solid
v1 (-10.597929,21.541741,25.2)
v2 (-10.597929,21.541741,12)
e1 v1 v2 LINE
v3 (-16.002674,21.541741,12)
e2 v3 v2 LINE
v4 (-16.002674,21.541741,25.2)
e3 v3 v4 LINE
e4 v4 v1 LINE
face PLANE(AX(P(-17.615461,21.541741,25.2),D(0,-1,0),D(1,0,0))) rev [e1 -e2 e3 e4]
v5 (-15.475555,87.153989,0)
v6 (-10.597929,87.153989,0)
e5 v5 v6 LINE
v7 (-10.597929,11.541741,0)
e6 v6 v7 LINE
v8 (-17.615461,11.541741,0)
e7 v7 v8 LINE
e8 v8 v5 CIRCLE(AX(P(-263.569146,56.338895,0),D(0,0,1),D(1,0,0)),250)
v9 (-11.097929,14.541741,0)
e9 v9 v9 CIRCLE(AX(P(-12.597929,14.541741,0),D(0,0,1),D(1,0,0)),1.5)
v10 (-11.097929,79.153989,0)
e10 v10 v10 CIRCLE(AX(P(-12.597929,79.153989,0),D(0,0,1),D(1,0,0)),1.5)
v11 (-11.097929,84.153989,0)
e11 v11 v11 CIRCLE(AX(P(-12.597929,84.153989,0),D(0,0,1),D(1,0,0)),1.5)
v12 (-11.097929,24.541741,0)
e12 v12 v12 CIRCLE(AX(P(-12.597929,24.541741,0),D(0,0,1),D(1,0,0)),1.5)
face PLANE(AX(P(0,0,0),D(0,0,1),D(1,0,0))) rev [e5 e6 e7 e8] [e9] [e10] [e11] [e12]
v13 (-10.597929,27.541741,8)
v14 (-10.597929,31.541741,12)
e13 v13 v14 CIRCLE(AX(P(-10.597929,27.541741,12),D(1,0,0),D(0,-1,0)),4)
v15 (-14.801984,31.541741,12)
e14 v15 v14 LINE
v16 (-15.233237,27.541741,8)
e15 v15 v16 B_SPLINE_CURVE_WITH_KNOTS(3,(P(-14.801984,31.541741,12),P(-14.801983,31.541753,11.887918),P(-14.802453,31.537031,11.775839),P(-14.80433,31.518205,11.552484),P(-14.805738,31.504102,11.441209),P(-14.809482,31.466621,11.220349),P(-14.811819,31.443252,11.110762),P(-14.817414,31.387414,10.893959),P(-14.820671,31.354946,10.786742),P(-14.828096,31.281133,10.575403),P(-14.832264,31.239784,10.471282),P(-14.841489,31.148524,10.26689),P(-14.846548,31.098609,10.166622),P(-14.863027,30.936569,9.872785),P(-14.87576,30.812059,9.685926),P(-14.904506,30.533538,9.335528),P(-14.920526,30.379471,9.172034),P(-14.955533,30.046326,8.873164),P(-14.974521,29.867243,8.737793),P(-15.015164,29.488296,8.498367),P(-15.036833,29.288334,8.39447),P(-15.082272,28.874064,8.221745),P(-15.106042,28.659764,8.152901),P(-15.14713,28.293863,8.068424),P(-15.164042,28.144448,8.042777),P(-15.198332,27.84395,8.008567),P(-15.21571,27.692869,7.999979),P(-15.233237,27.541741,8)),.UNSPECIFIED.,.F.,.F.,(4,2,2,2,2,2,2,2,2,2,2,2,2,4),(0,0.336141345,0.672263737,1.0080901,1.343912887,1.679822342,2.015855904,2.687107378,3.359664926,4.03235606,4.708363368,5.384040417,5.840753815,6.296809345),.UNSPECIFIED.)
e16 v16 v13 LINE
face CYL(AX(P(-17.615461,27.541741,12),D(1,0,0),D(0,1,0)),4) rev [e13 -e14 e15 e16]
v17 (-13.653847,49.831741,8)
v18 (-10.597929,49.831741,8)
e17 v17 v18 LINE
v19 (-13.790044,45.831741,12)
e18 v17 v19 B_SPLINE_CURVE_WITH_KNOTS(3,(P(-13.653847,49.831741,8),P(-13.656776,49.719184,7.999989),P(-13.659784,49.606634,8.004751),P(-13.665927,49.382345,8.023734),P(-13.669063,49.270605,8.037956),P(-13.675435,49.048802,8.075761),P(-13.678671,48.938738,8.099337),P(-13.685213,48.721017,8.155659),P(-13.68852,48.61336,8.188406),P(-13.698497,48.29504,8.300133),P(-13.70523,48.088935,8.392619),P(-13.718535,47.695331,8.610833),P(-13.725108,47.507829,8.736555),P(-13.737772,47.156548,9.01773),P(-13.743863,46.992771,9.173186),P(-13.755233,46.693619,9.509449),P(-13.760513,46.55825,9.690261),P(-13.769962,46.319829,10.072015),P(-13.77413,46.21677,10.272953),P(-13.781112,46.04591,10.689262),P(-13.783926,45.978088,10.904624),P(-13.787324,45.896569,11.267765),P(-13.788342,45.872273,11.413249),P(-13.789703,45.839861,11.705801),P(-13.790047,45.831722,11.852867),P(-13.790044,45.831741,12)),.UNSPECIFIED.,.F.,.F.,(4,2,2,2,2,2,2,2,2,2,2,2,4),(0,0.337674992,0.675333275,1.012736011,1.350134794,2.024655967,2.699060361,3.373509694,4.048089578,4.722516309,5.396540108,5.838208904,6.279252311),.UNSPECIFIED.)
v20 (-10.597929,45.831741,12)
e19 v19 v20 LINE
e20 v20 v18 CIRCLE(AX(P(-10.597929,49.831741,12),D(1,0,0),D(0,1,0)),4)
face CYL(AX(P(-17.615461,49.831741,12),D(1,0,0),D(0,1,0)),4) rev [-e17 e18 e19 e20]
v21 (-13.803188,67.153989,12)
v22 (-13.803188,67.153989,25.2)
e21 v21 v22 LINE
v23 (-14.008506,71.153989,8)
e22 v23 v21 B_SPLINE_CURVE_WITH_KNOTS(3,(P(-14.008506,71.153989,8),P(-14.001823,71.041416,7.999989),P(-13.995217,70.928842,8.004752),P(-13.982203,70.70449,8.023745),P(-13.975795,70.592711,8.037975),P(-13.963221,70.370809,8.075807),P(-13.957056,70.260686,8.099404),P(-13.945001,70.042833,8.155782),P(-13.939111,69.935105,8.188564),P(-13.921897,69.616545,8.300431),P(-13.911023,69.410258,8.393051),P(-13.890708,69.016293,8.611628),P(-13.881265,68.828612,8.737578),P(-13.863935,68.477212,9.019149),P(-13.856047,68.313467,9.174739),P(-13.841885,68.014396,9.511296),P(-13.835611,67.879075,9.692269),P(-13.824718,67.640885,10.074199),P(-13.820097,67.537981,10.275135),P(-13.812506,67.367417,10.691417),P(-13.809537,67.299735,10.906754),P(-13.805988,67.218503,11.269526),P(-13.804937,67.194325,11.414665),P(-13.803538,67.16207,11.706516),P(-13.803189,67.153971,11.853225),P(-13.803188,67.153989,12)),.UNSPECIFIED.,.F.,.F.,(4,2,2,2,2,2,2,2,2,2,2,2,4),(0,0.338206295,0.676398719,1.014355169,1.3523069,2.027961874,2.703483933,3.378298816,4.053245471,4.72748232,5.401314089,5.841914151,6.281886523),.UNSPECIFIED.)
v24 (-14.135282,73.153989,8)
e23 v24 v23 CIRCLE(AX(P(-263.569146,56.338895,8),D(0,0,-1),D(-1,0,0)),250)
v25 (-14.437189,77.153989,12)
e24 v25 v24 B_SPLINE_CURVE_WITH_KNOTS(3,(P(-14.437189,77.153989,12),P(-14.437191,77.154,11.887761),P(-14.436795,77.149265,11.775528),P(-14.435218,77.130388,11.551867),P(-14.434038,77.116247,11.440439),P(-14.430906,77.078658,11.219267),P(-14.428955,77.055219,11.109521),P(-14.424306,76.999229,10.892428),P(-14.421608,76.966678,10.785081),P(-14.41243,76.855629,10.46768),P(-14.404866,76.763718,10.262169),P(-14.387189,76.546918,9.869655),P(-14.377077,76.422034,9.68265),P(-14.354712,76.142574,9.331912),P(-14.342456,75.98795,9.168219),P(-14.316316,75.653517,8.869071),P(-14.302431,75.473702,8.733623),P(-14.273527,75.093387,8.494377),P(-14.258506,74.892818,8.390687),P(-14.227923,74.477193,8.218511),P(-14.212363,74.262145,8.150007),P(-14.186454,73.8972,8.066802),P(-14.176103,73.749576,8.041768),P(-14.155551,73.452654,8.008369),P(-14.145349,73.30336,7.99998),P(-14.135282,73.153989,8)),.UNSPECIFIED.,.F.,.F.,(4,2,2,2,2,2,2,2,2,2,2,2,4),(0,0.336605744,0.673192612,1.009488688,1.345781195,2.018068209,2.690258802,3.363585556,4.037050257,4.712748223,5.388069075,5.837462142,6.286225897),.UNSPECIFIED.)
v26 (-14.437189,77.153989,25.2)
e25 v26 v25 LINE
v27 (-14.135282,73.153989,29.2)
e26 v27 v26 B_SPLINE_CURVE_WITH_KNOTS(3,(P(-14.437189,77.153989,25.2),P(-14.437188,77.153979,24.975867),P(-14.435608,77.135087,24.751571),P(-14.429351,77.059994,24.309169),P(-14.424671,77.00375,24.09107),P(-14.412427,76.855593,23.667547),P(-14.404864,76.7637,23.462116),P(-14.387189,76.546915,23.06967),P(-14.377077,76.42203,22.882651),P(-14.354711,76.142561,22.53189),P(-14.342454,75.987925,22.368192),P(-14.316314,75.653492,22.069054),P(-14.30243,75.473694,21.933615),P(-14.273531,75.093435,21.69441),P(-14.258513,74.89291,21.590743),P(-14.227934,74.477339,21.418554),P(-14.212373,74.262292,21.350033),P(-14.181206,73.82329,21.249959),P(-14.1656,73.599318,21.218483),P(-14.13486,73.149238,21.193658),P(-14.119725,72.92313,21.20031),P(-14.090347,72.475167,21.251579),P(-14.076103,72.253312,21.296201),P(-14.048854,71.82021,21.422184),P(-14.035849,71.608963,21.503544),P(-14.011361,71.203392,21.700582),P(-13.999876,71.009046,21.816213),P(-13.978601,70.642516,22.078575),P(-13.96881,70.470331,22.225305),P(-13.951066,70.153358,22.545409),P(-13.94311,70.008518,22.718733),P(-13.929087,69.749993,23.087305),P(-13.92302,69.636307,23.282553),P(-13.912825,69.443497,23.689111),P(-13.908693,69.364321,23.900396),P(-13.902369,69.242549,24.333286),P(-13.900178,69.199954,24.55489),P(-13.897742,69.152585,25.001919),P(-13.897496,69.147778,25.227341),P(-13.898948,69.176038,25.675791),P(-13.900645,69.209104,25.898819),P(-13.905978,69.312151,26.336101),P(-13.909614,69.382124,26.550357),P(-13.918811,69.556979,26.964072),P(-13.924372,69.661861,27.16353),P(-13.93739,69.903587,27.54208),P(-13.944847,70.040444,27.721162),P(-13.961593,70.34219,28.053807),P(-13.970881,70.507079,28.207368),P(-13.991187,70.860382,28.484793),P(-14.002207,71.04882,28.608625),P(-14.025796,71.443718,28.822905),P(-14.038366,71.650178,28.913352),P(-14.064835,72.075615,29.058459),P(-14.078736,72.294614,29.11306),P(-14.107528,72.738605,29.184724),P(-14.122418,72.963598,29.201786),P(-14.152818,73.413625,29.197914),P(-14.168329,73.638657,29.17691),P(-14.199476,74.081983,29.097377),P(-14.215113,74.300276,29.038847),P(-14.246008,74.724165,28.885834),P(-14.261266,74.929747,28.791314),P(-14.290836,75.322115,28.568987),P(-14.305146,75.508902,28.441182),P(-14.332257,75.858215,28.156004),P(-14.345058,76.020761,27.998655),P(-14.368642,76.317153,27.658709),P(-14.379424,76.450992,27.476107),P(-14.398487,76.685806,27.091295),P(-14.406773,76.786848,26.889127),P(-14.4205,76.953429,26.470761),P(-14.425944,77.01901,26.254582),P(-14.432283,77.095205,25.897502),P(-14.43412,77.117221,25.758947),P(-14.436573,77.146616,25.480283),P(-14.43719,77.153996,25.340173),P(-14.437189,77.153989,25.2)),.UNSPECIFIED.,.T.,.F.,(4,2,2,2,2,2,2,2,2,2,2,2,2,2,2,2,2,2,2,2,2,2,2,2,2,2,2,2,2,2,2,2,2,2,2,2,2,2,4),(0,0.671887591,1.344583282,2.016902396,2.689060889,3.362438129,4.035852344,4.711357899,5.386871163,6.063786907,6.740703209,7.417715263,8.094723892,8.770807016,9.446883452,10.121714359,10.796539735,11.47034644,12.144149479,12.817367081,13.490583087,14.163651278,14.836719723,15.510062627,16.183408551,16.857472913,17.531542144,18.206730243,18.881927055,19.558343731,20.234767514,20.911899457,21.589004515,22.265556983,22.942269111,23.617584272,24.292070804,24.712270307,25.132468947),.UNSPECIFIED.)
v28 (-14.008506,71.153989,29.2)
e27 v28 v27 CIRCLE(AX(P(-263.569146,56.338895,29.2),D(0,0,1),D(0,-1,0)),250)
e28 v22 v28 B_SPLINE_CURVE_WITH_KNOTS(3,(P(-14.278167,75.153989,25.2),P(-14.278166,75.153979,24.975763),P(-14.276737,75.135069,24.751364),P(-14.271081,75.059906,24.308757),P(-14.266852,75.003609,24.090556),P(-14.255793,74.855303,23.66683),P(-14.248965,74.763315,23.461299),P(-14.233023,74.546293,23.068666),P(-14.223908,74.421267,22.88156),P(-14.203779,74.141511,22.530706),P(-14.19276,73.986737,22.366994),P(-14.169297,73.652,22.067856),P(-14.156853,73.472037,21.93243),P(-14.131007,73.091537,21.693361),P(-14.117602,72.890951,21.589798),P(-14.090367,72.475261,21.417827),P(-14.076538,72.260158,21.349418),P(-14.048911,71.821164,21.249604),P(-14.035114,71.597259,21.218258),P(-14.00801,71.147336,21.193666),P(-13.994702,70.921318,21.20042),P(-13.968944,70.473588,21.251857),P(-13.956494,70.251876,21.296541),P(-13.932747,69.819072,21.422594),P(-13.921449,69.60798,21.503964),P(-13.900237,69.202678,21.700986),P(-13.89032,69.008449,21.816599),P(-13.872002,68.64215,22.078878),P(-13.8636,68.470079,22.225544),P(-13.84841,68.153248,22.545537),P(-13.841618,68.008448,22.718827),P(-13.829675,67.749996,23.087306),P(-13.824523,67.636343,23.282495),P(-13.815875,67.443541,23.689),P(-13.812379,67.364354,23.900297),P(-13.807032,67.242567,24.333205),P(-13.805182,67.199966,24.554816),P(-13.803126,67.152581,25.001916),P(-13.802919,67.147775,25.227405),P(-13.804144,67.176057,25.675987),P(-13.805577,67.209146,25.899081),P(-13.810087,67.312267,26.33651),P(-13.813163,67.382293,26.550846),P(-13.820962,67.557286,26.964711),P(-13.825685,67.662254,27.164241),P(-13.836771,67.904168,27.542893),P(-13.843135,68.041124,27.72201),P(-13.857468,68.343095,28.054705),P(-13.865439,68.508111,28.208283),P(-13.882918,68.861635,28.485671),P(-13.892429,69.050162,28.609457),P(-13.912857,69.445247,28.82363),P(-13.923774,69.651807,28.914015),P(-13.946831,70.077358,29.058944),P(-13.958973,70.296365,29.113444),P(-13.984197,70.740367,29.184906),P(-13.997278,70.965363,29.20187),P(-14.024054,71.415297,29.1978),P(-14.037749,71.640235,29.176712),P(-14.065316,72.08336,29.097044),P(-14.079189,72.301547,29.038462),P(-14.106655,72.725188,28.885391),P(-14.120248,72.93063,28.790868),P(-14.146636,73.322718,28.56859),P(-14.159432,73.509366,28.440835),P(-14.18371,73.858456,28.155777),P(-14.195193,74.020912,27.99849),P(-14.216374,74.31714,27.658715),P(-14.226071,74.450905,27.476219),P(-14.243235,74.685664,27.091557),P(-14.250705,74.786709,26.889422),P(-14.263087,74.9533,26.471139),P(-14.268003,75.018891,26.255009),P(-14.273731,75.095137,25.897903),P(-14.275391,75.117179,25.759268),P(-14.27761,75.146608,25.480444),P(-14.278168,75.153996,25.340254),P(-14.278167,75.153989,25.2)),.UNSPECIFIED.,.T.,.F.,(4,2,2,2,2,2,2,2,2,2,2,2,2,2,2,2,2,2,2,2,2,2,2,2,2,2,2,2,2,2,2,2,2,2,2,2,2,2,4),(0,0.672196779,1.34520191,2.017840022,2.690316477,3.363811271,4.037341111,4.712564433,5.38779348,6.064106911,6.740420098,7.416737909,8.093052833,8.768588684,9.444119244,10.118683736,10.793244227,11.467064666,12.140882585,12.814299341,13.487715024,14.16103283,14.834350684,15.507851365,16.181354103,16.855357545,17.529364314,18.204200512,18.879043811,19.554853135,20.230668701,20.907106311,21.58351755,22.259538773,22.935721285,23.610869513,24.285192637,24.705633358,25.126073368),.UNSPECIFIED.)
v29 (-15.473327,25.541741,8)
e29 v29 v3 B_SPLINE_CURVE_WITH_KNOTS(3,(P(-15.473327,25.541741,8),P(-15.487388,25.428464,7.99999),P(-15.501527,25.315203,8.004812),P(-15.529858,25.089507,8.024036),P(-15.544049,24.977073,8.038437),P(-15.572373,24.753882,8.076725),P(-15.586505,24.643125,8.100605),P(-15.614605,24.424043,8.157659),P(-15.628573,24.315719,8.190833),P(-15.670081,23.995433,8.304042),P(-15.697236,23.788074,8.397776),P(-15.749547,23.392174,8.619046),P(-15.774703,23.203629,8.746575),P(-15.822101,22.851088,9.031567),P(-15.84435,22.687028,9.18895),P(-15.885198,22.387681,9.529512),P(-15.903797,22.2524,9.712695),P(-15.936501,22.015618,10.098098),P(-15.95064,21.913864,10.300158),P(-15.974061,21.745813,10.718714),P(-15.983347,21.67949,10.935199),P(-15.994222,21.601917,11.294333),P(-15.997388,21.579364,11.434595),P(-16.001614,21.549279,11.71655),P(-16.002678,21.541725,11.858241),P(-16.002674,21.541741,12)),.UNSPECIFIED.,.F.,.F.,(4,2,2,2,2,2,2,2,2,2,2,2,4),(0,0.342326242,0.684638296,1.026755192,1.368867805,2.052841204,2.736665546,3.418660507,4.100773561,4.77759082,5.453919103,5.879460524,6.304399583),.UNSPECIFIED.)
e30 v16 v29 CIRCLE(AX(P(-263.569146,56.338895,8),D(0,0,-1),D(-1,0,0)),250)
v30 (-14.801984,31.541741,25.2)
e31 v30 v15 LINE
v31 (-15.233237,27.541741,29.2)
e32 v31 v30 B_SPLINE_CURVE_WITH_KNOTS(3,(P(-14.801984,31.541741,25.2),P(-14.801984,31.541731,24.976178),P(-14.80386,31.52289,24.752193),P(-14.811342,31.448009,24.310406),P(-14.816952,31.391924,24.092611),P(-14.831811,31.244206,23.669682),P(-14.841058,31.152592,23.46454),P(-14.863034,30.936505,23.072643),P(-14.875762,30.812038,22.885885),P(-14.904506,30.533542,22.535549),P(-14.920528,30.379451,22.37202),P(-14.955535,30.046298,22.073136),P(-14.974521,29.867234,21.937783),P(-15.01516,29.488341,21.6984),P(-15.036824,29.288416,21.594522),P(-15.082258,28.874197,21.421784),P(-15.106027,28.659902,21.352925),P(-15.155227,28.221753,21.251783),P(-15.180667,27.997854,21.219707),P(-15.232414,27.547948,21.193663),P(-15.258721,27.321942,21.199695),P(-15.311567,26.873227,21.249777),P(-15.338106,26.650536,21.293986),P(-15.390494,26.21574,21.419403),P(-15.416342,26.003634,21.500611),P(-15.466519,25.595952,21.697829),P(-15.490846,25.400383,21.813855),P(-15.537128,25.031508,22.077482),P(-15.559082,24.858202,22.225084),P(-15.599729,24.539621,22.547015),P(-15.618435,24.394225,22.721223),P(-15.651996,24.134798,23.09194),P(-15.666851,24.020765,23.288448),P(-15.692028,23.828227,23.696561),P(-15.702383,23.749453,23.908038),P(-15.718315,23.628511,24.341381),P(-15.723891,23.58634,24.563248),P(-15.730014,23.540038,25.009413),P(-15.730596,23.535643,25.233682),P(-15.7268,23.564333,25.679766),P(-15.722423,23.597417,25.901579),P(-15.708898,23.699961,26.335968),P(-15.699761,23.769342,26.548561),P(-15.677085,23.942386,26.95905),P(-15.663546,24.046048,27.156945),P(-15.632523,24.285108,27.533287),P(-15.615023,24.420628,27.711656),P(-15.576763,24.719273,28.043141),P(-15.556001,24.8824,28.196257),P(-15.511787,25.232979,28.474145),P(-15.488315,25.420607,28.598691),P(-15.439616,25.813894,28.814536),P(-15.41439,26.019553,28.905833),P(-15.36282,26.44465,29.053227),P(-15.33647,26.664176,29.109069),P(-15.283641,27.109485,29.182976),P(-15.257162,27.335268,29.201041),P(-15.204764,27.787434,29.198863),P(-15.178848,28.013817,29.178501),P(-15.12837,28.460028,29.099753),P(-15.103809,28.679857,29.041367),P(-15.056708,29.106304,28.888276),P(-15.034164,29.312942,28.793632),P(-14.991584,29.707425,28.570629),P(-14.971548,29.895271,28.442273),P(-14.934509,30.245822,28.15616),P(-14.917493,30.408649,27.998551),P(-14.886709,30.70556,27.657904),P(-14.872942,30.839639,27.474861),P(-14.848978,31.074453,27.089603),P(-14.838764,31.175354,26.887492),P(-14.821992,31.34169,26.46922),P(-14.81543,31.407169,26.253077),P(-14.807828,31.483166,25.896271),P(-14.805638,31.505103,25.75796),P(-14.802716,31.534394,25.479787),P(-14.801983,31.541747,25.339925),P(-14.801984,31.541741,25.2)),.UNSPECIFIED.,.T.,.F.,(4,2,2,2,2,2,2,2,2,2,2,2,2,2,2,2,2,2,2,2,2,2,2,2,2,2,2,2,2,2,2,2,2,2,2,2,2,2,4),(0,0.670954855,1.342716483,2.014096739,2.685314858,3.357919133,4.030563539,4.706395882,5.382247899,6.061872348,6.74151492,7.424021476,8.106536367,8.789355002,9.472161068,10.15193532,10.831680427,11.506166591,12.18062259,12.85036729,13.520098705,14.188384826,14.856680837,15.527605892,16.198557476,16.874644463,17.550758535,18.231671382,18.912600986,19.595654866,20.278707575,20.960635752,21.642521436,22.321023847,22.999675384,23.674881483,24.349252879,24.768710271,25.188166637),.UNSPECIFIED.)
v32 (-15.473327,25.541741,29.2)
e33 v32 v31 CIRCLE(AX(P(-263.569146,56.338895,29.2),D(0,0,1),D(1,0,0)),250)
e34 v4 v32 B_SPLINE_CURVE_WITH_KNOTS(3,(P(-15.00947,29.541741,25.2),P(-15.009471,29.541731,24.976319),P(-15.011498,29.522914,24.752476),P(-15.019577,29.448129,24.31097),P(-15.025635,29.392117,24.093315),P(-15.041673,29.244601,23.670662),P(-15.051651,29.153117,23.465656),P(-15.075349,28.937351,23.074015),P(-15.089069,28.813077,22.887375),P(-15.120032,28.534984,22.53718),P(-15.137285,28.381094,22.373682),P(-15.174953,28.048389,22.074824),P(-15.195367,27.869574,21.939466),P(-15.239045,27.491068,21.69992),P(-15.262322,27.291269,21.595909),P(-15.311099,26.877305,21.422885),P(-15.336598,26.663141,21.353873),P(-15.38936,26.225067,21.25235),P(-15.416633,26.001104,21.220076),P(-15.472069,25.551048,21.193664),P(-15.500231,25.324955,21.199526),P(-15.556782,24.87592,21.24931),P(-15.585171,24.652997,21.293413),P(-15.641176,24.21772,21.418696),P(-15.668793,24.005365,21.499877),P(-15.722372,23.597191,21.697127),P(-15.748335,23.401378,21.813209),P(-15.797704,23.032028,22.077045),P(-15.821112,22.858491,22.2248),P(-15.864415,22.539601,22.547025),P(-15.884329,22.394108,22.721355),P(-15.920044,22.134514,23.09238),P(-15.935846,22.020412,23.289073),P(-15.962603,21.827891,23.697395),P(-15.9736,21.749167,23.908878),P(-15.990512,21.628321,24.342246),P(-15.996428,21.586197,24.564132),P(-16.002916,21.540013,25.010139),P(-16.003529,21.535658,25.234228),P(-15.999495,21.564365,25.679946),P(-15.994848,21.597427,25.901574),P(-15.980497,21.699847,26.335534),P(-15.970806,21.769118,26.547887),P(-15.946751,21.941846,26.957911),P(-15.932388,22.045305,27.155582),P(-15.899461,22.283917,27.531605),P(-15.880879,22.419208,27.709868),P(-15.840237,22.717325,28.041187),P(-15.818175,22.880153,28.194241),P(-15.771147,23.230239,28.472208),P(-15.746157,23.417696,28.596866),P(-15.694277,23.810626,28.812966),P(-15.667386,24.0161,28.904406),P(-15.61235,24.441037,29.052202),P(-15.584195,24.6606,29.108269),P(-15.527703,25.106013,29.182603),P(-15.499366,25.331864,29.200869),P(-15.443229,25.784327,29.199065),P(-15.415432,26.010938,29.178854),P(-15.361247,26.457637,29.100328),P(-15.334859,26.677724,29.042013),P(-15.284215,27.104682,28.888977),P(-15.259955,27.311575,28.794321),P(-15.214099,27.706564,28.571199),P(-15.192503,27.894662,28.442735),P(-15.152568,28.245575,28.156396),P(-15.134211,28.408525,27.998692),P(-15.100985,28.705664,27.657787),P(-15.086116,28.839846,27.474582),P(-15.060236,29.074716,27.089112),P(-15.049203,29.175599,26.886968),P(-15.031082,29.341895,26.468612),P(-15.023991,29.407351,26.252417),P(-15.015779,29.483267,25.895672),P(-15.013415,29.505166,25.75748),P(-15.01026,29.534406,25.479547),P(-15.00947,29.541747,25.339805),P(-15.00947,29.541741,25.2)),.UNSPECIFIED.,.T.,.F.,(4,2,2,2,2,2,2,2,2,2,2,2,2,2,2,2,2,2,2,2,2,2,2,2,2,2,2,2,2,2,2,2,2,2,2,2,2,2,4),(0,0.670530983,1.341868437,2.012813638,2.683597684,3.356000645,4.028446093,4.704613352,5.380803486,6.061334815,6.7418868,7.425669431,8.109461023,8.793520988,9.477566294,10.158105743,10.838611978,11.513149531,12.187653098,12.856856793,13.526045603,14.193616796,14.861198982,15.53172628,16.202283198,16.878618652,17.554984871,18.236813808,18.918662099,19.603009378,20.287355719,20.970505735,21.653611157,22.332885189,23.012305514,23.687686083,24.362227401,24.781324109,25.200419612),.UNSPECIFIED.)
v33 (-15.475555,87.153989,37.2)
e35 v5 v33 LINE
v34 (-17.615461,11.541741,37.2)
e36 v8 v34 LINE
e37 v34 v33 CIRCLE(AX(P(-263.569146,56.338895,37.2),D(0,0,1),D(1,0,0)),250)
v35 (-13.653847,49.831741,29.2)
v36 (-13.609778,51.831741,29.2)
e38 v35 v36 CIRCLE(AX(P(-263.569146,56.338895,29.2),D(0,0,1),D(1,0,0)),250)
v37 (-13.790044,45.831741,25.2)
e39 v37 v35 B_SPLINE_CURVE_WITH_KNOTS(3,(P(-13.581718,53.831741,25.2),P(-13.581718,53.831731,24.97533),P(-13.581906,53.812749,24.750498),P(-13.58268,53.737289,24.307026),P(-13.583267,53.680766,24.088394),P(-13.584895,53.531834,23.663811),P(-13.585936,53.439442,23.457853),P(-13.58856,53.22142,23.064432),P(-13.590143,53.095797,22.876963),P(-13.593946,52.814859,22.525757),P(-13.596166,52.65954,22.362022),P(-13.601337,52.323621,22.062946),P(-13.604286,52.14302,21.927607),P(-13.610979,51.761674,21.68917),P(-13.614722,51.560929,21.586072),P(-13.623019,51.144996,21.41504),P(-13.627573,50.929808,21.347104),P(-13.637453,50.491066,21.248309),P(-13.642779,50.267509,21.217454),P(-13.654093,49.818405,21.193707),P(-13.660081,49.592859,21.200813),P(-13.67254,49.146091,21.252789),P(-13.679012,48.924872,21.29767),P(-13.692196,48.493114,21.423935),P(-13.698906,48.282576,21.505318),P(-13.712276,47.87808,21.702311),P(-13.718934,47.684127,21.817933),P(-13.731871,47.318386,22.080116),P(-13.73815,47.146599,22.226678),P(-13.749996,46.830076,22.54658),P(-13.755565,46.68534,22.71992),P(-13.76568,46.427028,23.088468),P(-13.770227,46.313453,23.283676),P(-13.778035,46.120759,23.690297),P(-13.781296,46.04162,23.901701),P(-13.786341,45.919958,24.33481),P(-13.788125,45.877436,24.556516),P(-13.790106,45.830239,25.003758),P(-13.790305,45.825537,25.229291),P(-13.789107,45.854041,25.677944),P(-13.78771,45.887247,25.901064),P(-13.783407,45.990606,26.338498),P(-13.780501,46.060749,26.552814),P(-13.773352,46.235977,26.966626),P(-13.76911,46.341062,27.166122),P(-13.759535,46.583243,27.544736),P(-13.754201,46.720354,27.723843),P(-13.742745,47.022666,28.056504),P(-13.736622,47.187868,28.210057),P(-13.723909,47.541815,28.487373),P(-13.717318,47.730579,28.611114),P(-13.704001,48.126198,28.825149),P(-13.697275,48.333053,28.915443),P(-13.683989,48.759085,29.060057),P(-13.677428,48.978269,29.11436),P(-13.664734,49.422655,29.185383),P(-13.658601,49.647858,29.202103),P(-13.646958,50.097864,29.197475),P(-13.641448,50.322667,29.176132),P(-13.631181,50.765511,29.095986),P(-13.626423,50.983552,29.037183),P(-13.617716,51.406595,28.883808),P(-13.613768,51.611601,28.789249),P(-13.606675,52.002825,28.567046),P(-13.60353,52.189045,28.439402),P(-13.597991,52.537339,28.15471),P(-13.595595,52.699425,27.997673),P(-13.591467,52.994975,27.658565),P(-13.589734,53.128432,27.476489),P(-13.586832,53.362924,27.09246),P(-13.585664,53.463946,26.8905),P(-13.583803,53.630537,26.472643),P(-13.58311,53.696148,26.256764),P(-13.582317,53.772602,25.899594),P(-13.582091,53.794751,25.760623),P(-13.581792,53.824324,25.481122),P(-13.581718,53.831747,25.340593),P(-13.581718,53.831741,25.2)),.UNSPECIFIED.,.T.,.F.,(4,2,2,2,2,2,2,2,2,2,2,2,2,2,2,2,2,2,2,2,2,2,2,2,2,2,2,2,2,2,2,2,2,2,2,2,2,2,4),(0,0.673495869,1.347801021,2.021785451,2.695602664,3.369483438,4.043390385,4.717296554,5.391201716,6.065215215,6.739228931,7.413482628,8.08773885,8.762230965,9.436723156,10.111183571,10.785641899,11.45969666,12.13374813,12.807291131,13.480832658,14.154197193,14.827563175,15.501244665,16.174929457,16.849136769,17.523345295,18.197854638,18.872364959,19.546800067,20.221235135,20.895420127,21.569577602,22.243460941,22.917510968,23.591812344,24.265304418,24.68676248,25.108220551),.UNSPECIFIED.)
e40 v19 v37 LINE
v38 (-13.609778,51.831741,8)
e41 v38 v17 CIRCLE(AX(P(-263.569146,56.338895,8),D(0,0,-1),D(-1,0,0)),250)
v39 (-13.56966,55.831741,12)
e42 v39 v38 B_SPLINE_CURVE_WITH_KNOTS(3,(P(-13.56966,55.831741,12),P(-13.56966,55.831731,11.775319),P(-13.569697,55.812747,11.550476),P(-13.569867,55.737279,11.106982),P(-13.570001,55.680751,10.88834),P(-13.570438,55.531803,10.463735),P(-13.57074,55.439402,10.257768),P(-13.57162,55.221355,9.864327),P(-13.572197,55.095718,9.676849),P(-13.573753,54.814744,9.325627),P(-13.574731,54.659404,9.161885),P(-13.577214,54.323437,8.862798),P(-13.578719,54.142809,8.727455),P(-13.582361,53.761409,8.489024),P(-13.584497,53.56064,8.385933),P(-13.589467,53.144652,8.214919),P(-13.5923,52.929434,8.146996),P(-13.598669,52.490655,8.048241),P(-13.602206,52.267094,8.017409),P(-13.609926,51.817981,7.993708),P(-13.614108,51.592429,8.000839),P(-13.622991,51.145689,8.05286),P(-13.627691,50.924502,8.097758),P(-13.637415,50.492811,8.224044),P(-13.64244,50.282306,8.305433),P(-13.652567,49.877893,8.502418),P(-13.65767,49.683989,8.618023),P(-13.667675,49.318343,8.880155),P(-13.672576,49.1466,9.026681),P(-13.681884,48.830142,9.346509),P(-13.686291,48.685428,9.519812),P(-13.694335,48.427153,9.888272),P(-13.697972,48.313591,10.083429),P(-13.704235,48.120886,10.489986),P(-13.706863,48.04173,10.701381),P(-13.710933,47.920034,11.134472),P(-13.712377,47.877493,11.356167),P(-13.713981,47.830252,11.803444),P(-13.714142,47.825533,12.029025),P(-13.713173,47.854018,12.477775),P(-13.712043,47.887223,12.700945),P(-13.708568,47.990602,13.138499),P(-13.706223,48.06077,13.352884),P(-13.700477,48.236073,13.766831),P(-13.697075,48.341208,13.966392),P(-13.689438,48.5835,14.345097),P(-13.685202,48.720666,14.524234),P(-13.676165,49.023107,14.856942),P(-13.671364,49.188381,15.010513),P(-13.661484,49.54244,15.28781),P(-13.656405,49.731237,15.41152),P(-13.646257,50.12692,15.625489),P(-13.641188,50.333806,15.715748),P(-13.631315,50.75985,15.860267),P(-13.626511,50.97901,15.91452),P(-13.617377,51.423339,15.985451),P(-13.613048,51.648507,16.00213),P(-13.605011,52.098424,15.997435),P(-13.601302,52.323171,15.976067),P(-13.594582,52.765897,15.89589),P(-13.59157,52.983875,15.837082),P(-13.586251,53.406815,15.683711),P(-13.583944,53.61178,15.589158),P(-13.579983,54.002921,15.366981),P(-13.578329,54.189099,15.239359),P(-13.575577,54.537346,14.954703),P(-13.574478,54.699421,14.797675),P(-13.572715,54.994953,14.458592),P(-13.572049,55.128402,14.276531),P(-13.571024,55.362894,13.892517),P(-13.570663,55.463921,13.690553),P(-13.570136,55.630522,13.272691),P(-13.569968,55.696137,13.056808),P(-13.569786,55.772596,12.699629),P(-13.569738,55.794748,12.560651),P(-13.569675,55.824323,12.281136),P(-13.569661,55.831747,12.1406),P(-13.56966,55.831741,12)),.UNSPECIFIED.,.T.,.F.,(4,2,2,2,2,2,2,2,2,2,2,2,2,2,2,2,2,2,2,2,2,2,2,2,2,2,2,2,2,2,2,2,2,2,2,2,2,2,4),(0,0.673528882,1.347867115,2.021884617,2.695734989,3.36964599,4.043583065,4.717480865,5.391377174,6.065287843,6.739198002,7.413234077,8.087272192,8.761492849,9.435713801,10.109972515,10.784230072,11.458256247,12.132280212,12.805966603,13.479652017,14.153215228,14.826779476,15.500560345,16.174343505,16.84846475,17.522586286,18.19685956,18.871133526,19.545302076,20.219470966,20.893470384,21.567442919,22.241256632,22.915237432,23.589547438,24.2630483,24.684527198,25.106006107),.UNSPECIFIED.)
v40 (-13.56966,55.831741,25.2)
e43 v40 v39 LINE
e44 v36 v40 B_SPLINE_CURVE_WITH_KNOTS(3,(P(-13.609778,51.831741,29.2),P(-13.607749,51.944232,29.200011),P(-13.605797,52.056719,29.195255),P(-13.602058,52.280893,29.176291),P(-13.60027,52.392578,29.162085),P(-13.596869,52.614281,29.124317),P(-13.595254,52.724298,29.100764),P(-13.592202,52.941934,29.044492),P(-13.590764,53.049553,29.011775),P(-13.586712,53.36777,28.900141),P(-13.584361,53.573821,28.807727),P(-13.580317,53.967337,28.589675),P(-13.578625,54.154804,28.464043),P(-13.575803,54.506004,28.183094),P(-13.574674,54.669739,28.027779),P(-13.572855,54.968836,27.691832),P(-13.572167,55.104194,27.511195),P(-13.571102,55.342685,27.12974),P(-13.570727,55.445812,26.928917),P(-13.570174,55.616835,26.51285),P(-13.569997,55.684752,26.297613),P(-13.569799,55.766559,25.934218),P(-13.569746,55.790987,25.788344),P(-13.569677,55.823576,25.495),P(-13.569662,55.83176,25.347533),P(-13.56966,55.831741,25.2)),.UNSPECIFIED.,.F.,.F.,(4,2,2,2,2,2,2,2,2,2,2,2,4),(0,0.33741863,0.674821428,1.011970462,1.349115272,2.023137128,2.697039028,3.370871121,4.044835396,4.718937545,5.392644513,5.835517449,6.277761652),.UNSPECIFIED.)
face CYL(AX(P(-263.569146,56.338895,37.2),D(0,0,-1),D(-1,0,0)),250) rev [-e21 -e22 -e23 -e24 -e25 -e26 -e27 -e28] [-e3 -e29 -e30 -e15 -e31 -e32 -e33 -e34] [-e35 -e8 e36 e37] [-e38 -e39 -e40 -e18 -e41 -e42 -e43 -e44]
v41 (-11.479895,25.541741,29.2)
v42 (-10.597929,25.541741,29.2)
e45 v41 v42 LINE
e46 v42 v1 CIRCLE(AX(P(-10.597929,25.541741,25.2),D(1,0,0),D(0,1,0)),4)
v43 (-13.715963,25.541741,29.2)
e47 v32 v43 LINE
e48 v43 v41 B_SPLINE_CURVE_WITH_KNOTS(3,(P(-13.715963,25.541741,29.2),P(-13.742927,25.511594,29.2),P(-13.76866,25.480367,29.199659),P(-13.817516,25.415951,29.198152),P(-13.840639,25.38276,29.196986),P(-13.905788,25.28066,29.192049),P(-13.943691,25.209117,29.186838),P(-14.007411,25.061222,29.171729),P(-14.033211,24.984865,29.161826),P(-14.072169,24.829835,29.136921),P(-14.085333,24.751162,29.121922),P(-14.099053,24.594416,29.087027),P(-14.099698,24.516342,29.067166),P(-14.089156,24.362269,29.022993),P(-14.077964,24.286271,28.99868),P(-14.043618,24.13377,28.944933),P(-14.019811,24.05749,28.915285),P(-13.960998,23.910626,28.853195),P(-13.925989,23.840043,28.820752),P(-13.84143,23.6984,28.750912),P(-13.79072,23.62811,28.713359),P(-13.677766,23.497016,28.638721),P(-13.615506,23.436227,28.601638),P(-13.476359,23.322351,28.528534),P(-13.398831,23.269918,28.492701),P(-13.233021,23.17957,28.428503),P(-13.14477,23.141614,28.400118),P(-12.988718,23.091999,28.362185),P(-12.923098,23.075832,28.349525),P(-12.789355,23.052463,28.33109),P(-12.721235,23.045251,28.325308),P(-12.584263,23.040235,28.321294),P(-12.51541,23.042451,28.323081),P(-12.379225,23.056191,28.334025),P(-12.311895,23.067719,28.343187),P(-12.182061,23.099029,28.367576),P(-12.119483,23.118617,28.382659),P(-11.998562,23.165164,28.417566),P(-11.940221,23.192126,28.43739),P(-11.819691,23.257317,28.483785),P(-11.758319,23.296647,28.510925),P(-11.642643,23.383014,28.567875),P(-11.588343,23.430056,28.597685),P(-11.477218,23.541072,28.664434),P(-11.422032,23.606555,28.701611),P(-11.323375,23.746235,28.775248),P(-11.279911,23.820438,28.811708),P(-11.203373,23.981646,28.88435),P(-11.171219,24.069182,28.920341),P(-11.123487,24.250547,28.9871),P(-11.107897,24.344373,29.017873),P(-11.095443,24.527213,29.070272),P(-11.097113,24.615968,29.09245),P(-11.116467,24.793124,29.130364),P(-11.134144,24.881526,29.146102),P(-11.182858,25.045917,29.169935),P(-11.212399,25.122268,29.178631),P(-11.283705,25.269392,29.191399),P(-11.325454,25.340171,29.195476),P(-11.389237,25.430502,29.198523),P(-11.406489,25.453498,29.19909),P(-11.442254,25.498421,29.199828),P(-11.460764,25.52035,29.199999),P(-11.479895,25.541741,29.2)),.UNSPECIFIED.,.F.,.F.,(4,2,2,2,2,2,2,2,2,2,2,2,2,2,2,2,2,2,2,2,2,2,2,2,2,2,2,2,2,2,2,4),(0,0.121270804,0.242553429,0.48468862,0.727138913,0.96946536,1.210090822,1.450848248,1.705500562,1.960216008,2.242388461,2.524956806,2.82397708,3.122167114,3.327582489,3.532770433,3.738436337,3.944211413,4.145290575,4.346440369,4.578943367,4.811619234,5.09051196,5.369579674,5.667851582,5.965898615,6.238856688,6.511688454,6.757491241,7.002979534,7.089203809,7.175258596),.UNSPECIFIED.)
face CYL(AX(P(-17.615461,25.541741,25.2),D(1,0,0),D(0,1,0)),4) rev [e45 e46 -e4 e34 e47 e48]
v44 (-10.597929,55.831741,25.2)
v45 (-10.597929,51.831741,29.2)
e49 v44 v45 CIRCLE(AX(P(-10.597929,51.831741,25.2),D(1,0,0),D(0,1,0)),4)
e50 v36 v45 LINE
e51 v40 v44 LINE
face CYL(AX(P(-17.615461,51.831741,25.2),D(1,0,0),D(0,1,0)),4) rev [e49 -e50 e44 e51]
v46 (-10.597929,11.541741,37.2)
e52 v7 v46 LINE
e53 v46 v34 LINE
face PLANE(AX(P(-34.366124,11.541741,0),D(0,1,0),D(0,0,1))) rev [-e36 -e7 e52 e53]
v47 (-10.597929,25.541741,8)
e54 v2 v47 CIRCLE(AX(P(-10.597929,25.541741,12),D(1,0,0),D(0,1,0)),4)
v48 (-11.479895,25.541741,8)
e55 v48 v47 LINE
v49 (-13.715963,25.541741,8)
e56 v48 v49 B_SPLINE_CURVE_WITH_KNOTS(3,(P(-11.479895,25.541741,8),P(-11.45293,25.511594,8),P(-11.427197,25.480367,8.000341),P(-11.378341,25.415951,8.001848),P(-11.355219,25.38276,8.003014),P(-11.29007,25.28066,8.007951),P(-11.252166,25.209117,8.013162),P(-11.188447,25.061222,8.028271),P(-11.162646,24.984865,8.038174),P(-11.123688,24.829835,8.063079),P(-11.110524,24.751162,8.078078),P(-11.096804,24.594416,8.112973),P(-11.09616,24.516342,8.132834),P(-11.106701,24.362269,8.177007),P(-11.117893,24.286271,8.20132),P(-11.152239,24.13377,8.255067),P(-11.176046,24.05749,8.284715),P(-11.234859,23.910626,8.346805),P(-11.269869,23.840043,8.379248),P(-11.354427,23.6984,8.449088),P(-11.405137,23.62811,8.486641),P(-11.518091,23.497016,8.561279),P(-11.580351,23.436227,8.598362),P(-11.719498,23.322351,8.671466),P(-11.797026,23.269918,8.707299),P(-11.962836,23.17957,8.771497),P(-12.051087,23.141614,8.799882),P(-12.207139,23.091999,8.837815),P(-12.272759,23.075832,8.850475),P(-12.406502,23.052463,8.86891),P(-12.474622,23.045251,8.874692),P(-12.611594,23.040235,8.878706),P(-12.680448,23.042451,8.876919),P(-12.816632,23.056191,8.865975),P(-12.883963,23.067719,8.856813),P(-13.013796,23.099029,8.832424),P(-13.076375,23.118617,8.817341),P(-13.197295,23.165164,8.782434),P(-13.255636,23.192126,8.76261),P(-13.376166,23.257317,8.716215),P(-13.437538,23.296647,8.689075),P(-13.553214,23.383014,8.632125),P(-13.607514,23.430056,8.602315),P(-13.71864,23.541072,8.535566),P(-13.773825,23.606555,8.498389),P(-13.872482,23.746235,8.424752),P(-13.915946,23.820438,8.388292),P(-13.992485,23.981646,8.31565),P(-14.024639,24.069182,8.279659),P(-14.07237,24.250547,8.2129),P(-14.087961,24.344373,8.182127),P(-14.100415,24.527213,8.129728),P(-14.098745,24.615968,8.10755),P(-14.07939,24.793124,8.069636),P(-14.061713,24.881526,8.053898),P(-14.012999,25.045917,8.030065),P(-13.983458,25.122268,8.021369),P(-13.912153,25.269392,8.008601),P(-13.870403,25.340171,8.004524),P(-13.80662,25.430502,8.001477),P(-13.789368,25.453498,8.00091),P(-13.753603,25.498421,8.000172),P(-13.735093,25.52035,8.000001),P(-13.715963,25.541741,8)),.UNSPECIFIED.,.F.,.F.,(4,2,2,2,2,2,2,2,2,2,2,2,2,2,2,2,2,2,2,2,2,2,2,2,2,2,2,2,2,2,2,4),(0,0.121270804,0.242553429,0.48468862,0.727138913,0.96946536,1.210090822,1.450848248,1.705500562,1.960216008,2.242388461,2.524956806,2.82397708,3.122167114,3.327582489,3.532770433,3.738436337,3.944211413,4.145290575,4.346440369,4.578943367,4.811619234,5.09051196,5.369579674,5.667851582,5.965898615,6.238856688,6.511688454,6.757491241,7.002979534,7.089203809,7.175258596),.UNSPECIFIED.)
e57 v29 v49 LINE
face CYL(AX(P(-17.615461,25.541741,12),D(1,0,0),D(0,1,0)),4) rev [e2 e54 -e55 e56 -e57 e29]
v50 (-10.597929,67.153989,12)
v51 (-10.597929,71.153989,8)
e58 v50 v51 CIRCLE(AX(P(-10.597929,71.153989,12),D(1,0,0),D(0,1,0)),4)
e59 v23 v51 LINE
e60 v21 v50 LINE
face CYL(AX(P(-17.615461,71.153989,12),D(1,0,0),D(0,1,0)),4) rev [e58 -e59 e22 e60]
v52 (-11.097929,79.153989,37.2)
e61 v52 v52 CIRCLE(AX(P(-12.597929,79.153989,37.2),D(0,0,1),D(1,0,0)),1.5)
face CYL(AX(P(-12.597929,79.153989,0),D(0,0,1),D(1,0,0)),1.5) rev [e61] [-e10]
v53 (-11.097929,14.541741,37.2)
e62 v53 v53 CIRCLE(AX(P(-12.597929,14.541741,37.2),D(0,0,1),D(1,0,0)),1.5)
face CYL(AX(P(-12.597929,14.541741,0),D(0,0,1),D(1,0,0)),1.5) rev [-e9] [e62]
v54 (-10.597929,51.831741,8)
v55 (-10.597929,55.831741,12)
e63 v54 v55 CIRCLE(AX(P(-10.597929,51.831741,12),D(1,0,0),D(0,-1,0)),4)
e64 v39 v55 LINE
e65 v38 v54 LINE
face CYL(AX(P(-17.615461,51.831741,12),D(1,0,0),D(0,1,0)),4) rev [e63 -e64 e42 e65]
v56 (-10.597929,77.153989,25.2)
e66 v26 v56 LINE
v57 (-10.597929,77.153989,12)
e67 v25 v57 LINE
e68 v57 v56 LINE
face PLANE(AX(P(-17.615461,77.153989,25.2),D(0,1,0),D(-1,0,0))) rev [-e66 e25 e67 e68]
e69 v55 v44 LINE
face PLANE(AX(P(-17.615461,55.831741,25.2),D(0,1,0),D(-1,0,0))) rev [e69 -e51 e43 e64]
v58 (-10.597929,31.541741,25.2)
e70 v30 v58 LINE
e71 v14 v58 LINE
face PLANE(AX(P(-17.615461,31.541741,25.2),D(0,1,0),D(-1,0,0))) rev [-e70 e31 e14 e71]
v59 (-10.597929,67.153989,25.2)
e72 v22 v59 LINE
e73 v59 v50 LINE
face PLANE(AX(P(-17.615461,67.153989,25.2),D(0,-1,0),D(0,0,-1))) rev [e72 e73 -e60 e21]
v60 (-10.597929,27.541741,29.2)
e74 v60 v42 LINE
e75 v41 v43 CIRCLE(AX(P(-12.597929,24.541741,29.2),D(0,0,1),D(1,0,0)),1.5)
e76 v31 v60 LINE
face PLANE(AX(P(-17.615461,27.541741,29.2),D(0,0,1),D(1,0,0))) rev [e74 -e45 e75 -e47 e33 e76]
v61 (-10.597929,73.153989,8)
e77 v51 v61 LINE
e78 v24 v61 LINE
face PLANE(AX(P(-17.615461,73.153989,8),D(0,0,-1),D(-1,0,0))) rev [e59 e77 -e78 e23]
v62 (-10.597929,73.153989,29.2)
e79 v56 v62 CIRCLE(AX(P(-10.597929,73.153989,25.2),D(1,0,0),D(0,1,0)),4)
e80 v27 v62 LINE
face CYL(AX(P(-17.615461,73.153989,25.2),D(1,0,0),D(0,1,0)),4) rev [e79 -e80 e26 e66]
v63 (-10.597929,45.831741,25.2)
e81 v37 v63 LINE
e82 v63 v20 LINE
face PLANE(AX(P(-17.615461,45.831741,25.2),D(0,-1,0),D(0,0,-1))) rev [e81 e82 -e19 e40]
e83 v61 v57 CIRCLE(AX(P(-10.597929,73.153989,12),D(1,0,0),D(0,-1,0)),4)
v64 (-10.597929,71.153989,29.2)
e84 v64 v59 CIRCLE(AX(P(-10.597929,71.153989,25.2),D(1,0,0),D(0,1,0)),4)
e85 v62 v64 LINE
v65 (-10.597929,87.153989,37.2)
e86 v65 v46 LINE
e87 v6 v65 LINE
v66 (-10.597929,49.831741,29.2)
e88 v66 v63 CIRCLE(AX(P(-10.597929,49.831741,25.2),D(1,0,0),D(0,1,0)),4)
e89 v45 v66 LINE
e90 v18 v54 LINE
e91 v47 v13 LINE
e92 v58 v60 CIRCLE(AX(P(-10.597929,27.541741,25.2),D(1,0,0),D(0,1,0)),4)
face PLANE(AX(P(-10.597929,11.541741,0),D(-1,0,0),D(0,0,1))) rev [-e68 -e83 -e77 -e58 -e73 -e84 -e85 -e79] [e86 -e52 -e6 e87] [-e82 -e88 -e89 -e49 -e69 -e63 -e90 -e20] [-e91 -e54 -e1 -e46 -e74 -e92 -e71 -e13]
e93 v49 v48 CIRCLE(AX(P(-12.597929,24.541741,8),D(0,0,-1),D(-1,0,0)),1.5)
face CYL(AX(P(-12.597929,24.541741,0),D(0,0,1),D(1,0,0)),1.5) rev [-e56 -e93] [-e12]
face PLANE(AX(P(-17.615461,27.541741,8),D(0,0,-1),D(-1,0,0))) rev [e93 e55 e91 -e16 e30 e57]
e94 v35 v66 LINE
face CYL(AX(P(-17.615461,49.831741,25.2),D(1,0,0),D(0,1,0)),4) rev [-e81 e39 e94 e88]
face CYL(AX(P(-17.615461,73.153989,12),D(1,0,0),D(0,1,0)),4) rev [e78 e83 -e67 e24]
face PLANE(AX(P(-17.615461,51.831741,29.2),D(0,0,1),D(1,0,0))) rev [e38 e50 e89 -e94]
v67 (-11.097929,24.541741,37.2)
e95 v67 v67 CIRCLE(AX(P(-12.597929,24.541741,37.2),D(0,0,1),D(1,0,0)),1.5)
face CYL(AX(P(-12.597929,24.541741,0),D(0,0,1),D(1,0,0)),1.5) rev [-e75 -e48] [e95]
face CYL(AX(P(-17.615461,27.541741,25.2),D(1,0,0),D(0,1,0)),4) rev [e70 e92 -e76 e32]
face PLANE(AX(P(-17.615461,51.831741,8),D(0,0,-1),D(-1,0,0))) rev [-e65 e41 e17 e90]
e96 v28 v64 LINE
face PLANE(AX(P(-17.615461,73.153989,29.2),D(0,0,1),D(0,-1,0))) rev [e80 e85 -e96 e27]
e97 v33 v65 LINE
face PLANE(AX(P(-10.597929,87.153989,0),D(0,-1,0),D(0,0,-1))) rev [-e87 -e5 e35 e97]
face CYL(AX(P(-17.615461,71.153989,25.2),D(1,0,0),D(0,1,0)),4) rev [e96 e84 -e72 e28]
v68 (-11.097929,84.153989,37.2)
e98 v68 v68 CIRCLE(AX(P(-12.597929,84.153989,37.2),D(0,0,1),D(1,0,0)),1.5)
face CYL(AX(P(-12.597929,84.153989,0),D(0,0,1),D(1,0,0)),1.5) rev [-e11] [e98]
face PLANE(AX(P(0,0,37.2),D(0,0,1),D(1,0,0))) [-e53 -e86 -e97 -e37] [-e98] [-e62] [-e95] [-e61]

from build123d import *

# Parameters (mm, degrees)
RESSALTO_EXTRUS_O1_DEPTH = 37.2
FILETE3_R                = 10
FILETE4_R                = 10
ESBO_O3_W                = 64.493903811
ESBO_O3_H                = 22.028162523
CORTE_EXTRUS_O2_DEPTH    = 126.622328301
ESBO_O4_W                = 55.088928671
ESBO_O4_H                = 123.119514717
CORTE_EXTRUS_O3_DEPTH    = 126.622328159
ESBO_O5_W                = 12.155718474
ESBO_O5_H                = 25
CORTE_EXTRUS_O4_DEPTH    = 120.46824597
CORTE_EXTRUS_O5_DEPTH    = 96.020543125
ESBO_O7_R                = 1.5
CORTE_EXTRUS_O6_DEPTH    = 97.384450815


with BuildPart() as part:
    # Esboço1 → Ressalto-extrusão1 (new body)
    with BuildSketch(Plane.XY):
        with BuildLine():
            ThreePointArc((-10, 0), (0, -10), (10, 0))
            Line((10, 0), (20, 0))
            ThreePointArc((20, 0), (14.071698091, 40.495175194), (14.829943665, 81.414963086))
            ThreePointArc((14.829943665, 81.414963086), (11.193742071, 116.066691762), (-16.576524471, 95.024435265))
            Line((-16.576524471, 95.024435265), (-16.487894969, 94.437265709))
            Line((-16.487894969, 94.437265709), (-16.369382775, 93.652123615))
            ThreePointArc((-16.369382775, 93.652123615), (-13.756795166, 46.654405302), (-20, 0))
            Line((-20, 0), (-10, 0))
        make_face()
    extrude(amount=RESSALTO_EXTRUS_O1_DEPTH)

    # Filete3
    # the kernel refuses this fillet: 10 mm, written as the material it takes off along each edge
    with BuildSketch(Plane(origin=(20, 0, -29.463728433), x_dir=(-0.20232831186330175, 0.9793177493635794, 0), z_dir=(0, 0, 1))) as filete3_piece_1:
        with BuildLine():
            CenterArc((12.021201201, 9.997221658), FILETE3_R, 181.169168083, 87.480189)
            Line((2.023283119, 9.793177494), (1.823324757, 9.78909661))
            ThreePointArc((1.823324757, 9.78909661), (0.815778009, 4.937054409), (-0.19586355, 0.040465662))
            Line((-0.19586355, 0.040465662), (0.004714197, -0.199944433))
            ThreePointArc((0.004714197, -0.199944433), (5.892745687, -0.130541448), (11.780777177, -0.199944433))
            Line((11.780777177, -0.199944433), (11.785491373, 0))
        make_face()
    extrude(amount=96.127456867, mode=Mode.SUBTRACT)
    with BuildSketch(Plane(origin=(-20, 0, -29.463728433), x_dir=(1, 0, 0), z_dir=(0, 0, 1))) as filete3_piece_2:
        with BuildLine():
            CenterArc((12.222685959, 9.749854723), FILETE3_R, 169.67749742, 87.480189)
            Line((2.384538574, 11.541740887), (2.187775626, 11.57757861))
            ThreePointArc((2.187775626, 11.57757861), (1.06442773, 5.797282674), (-0.194855317, 0.045071116))
            Line((-0.194855317, 0.045071116), (0, -0.2))
            ThreePointArc((0, -0.2), (5, -0.2), (9.955546281, -0.194997094))
            Line((9.955546281, -0.194997094), (10, 0))
        make_face()
    extrude(amount=96.127456867, mode=Mode.SUBTRACT)

    # Filete4
    filete4_edges = [part.edges().sort_by_distance(p)[0] for p in [
        (10, 0, 18.6),
        (-10, 0, 18.6),
    ]]
    fillet(filete4_edges, radius=FILETE4_R)

    # Esboço3 → Corte-extrusão2 (cut, through all)
    with BuildSketch(Plane.XY.offset(37.2)):
        with Locations((-2.119172362, 0.527659626)):
            Rectangle(ESBO_O3_W, ESBO_O3_H)
    extrude(amount=-CORTE_EXTRUS_O2_DEPTH, mode=Mode.SUBTRACT)

    # Esboço4 → Corte-extrusão3 (cut, through all)
    with BuildSketch(Plane.XY.offset(37.2)):
        with Locations((16.946535692, 73.101498246)):
            Rectangle(ESBO_O4_W, ESBO_O4_H)
    extrude(amount=-CORTE_EXTRUS_O3_DEPTH, mode=Mode.SUBTRACT)

    # Esboço5 → Corte-extrusão4 (cut, through all)
    with BuildSketch(Plane.XY.offset(37.2)):
        with Locations((-16.675787881, 99.653989291)):
            Rectangle(ESBO_O5_W, ESBO_O5_H)
    extrude(amount=-CORTE_EXTRUS_O4_DEPTH, mode=Mode.SUBTRACT)

    # Esboço6 → Corte-extrusão5 (cut, through all)
    with BuildSketch(Plane(origin=(-10.597928644, 0, 0), x_dir=(0, 0, -1), z_dir=(1, 0, 0))):
        with BuildLine():
            Line((-25.2, 77.153989291), (-12, 77.153989291))
            ThreePointArc((-12, 77.153989291), (-9.171572875, 75.982416416), (-8, 73.153989291))
            Line((-8, 73.153989291), (-8, 71.153989291))
            ThreePointArc((-8, 71.153989291), (-9.171572875, 68.325562166), (-12, 67.153989291))
            Line((-12, 67.153989291), (-25.2, 67.153989291))
            ThreePointArc((-25.2, 67.153989291), (-28.028427125, 68.325562166), (-29.2, 71.153989291))
            Line((-29.2, 71.153989291), (-29.2, 73.153989291))
            ThreePointArc((-29.2, 73.153989291), (-28.028427125, 75.982416416), (-25.2, 77.153989291))
        make_face()
        with BuildLine():
            Line((-25.2, 55.831740887), (-12, 55.831740887))
            ThreePointArc((-12, 55.831740887), (-9.171572875, 54.660168012), (-8, 51.831740887))
            Line((-8, 51.831740887), (-8, 49.831740887))
            ThreePointArc((-8, 49.831740887), (-9.171572875, 47.003313762), (-12, 45.831740887))
            Line((-12, 45.831740887), (-25.2, 45.831740887))
            ThreePointArc((-25.2, 45.831740887), (-28.028427125, 47.003313762), (-29.2, 49.831740887))
            Line((-29.2, 49.831740887), (-29.2, 51.831740887))
            ThreePointArc((-29.2, 51.831740887), (-28.028427125, 54.660168012), (-25.2, 55.831740887))
        make_face()
        with BuildLine():
            Line((-25.2, 31.541740887), (-12, 31.541740887))
            ThreePointArc((-12, 31.541740887), (-9.171572875, 30.370168012), (-8, 27.541740887))
            Line((-8, 27.541740887), (-8, 25.541740887))
            ThreePointArc((-8, 25.541740887), (-9.171572875, 22.713313762), (-12, 21.541740887))
            Line((-12, 21.541740887), (-25.2, 21.541740887))
            ThreePointArc((-25.2, 21.541740887), (-28.028427125, 22.713313762), (-29.2, 25.541740887))
            Line((-29.2, 25.541740887), (-29.2, 27.541740887))
            ThreePointArc((-29.2, 27.541740887), (-28.028427125, 30.370168012), (-25.2, 31.541740887))
        make_face()
    extrude(amount=-CORTE_EXTRUS_O5_DEPTH, mode=Mode.SUBTRACT)

    # Esboço7 → Corte-extrusão6 (cut, through all)
    with BuildSketch(Plane.XY.offset(37.2)):
        with Locations((-12.597928644, 14.541740887)):
            Circle(ESBO_O7_R)
        with Locations((-12.597928644, 84.153989291)):
            Circle(ESBO_O7_R)
        with Locations((-12.597928644, 79.153989291)):
            Circle(ESBO_O7_R)
        with Locations((-12.597928644, 24.541740887)):
            Circle(ESBO_O7_R)
    extrude(amount=-CORTE_EXTRUS_O6_DEPTH, mode=Mode.SUBTRACT)


solid = part.part
